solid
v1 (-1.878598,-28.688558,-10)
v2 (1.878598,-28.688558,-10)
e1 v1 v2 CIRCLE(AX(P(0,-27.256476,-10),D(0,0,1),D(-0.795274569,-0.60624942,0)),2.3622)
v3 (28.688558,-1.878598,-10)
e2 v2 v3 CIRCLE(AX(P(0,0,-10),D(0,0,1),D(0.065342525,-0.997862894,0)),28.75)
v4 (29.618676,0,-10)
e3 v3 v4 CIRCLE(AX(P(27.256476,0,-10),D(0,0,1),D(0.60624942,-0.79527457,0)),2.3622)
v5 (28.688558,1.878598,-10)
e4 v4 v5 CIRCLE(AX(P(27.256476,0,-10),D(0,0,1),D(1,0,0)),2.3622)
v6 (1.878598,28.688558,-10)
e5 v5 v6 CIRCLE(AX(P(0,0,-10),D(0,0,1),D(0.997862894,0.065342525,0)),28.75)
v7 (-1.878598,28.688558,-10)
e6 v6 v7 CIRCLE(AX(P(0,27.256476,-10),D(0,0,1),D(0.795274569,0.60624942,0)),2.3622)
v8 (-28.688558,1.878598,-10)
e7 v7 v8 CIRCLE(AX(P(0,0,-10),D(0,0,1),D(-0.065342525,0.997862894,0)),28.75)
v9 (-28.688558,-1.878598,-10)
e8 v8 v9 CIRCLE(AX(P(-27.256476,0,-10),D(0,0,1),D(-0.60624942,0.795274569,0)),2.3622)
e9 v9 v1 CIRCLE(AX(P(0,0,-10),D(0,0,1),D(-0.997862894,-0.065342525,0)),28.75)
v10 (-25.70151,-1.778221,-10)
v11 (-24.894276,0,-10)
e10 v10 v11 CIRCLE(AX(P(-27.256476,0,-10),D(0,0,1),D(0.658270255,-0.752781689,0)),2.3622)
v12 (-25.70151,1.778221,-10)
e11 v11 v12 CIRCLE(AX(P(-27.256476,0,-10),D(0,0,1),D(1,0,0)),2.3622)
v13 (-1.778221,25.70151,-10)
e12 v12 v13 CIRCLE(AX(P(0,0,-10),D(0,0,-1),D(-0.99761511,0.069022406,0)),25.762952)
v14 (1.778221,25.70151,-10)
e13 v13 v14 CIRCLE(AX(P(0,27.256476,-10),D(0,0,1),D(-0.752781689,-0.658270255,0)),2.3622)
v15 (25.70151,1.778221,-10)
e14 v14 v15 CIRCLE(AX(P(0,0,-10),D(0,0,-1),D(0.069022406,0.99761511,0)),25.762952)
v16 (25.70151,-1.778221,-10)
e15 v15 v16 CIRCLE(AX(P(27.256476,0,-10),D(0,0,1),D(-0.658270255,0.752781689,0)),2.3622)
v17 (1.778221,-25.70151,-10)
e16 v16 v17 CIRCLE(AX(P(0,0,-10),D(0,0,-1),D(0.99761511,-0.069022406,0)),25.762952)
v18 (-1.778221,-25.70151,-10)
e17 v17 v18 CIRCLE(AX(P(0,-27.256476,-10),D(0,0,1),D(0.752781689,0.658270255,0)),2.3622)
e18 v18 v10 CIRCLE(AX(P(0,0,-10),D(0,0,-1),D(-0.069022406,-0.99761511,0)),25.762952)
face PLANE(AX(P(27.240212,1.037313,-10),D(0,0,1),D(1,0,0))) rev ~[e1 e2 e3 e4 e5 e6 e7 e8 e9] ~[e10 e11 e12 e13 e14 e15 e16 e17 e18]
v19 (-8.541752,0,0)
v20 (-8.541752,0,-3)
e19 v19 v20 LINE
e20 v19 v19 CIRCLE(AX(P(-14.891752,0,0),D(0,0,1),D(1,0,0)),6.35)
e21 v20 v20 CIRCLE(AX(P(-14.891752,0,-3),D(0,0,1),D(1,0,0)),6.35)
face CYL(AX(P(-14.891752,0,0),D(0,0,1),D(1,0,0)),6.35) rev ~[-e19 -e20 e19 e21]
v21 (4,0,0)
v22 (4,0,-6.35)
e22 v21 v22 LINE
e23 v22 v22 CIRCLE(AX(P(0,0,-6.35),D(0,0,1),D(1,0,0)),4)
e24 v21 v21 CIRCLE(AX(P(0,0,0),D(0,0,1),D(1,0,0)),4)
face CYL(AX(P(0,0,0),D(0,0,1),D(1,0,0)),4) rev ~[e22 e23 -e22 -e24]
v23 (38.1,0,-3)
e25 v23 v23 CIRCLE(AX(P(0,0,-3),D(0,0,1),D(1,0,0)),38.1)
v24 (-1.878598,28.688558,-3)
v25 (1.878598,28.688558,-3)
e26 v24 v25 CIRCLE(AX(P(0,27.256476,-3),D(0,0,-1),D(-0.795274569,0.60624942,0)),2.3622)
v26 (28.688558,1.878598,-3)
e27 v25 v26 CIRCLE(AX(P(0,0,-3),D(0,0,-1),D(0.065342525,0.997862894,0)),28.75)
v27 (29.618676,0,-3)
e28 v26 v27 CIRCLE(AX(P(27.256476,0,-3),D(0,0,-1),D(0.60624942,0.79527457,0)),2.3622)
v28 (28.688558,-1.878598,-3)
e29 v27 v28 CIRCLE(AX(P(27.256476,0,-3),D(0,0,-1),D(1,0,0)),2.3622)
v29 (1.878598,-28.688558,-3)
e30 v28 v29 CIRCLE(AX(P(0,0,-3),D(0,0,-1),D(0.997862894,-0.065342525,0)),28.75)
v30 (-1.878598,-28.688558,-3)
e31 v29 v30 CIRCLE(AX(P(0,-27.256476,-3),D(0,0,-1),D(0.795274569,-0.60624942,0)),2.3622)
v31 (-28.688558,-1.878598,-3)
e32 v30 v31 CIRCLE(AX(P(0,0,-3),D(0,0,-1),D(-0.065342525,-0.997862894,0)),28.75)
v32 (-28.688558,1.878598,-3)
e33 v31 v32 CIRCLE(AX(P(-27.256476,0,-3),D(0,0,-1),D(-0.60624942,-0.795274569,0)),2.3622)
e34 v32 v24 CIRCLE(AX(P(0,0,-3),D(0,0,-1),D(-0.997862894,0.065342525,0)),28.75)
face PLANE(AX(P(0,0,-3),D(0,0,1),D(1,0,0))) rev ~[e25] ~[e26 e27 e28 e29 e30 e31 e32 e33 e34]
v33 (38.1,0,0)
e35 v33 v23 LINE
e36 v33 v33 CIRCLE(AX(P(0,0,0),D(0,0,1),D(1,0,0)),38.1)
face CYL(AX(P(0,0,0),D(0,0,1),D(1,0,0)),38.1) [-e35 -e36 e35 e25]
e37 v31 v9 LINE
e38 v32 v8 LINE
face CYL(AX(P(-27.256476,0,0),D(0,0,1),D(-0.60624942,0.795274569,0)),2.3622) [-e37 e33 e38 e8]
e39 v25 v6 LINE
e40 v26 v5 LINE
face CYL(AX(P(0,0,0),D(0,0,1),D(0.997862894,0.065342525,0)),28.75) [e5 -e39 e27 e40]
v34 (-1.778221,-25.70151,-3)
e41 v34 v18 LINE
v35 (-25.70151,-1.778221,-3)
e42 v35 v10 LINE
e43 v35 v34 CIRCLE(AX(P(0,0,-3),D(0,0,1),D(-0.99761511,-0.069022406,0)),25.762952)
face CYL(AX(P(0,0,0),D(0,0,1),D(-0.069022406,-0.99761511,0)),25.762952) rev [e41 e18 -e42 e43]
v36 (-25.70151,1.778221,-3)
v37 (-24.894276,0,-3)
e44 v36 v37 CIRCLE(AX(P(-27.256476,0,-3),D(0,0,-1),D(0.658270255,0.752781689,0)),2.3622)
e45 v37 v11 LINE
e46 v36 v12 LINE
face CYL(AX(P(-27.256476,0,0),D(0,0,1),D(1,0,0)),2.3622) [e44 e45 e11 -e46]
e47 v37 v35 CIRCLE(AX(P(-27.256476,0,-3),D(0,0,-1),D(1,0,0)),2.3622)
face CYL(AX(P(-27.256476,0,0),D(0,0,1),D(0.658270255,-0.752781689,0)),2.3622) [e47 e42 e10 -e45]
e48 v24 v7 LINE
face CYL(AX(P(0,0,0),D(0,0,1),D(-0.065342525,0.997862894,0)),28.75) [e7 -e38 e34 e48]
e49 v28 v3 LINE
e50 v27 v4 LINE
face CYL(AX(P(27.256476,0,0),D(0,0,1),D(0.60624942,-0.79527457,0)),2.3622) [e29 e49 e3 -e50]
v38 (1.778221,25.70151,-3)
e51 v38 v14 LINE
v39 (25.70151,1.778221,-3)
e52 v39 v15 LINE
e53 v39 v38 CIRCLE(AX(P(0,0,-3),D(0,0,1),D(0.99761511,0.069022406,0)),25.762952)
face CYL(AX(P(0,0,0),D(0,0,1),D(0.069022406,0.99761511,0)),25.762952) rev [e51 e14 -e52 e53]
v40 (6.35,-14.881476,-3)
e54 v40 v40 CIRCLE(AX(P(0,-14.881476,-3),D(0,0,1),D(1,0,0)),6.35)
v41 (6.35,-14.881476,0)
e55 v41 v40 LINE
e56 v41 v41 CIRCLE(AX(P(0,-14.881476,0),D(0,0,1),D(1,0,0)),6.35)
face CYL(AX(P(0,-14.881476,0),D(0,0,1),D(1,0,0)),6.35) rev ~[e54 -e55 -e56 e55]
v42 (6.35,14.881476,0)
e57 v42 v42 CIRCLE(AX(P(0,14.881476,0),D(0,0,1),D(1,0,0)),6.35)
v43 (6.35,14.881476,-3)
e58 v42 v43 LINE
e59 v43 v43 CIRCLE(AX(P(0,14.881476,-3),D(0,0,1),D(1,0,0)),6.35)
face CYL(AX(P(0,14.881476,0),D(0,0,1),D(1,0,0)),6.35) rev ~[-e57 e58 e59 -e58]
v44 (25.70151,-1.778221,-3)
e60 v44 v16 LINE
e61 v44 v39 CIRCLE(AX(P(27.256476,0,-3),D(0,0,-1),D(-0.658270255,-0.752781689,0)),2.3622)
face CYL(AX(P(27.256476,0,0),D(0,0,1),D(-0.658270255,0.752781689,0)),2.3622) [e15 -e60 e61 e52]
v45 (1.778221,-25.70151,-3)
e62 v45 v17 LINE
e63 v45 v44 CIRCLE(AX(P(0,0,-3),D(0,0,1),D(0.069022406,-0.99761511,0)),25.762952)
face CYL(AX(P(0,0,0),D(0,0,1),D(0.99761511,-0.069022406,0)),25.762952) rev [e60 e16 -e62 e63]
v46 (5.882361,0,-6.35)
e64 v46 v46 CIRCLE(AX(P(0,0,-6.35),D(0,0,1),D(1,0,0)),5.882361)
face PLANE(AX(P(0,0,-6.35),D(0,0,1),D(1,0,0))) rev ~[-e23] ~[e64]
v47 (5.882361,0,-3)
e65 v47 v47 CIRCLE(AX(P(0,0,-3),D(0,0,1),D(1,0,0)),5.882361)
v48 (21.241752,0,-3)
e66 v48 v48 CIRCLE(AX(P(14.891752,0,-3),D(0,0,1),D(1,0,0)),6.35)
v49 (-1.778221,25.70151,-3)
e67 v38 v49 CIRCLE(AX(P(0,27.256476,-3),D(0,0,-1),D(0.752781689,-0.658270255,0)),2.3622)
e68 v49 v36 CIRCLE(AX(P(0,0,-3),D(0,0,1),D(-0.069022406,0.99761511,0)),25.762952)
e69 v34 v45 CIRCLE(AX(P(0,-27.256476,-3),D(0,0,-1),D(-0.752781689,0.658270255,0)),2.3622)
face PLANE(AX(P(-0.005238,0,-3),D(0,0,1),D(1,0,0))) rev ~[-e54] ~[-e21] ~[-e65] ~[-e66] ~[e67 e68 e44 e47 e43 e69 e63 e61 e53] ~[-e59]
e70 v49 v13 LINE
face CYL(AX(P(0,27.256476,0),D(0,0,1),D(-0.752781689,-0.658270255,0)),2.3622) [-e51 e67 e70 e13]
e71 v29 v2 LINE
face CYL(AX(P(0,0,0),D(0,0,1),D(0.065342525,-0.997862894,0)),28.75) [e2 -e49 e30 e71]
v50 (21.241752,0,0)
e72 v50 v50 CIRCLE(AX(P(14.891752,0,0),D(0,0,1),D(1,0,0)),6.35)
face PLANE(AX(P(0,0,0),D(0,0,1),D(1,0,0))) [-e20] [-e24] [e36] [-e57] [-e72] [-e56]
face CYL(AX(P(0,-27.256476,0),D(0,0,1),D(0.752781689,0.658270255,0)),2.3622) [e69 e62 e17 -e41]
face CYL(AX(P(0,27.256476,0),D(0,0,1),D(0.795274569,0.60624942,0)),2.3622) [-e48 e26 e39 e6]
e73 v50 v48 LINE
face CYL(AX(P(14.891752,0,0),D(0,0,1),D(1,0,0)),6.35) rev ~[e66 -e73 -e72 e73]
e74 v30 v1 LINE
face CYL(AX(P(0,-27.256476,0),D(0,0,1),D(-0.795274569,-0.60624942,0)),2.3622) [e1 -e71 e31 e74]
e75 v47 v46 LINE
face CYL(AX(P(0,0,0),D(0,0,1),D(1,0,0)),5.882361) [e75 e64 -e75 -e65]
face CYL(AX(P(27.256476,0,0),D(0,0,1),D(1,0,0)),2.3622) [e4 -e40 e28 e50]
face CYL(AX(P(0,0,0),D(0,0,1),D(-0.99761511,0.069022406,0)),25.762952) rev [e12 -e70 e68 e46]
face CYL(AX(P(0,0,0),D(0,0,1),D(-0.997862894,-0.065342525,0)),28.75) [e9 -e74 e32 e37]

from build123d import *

# Parameters (mm, degrees)
F1_DEPTH = 10
F0_R     = 38.1
F0_R_2   = 6.35
F0_R_3   = 5.8823611715
F2_DEPTH = 3
F0_R_4   = 4
F3_DEPTH = 6.35


with BuildPart() as f1:
    # F0 (on Top) → F1 (new body)
    with BuildSketch(Plane.XY):
        with BuildLine():
            Line((25.7629516235, 0), (28.75, 0))
            ThreePointArc((28.75, 0), (28.7346354423, 0.9398010419), (28.6885581914, 1.878597588))
            ThreePointArc((28.6885581914, 1.878597588), (27.1771412956, 2.3608673988), (25.7015098149, 1.7782209055))
            ThreePointArc((25.7015098149, 1.7782209055), (25.7475865895, 0.889641035), (25.7629516235, 0))
        make_face()
        with BuildLine():
            ThreePointArc((28.6885581914, 1.878597588), (28.7346354423, 0.9398010419), (28.75, 0))
            ThreePointArc((28.75, 0), (28.7346354423, -0.9398010419), (28.6885581914, -1.878597588))
            ThreePointArc((28.6885581914, -1.878597588), (29.3734139116, -1.0481230469), (29.6186758117, 0))
            ThreePointArc((29.6186758117, 0), (29.3734139116, 1.0481230469), (28.6885581914, 1.878597588))
        make_face()
        with BuildLine():
            ThreePointArc((28.6885581914, -1.878597588), (28.7346354423, -0.9398010419), (28.75, 0))
            Line((28.75, 0), (25.7629516235, 0))
            ThreePointArc((25.7629516235, 0), (25.7475865895, -0.889641035), (25.7015098149, -1.7782209055))
            ThreePointArc((25.7015098149, -1.7782209055), (27.1771412956, -2.3608673988), (28.6885581914, -1.878597588))
        make_face()
        with BuildLine():
            ThreePointArc((25.7015098149, 1.7782209055), (27.1771412956, 2.3608673988), (28.6885581914, 1.878597588))
            ThreePointArc((28.6885581914, 1.878597588), (20.3293199591, 20.3293199591), (1.878597588, 28.6885581914))
            ThreePointArc((1.878597588, 28.6885581914), (2.2380361997, 28.0122421835), (2.3622, 27.2564758117))
            ThreePointArc((2.3622, 27.2564758117), (2.2113912208, 26.4259713213), (1.7782209055, 25.7015098149))
            ThreePointArc((1.7782209055, 25.7015098149), (18.2171577963, 18.2171577963), (25.7015098149, 1.7782209055))
        make_face()
        with BuildLine():
            ThreePointArc((1.878597588, -28.6885581914), (20.3293199591, -20.3293199591), (28.6885581914, -1.878597588))
            ThreePointArc((28.6885581914, -1.878597588), (27.1771412956, -2.3608673988), (25.7015098149, -1.7782209055))
            ThreePointArc((25.7015098149, -1.7782209055), (18.2171577963, -18.2171577963), (1.7782209055, -25.7015098149))
            ThreePointArc((1.7782209055, -25.7015098149), (2.2113912208, -26.4259713213), (2.3622, -27.2564758117))
            ThreePointArc((2.3622, -27.2564758117), (2.2380361997, -28.0122421835), (1.878597588, -28.6885581914))
        make_face()
        with BuildLine():
            ThreePointArc((25.7015098149, -1.7782209055), (25.7475865895, -0.889641035), (25.7629516235, 0))
            ThreePointArc((25.7629516235, 0), (25.7475865895, 0.889641035), (25.7015098149, 1.7782209055))
            ThreePointArc((25.7015098149, 1.7782209055), (24.8942758117, 0), (25.7015098149, -1.7782209055))
        make_face()
        with BuildLine():
            ThreePointArc((2.3622, 27.2564758117), (2.2380361997, 28.0122421835), (1.878597588, 28.6885581914))
            ThreePointArc((1.878597588, 28.6885581914), (0.9398010419, 28.7346354423), (0, 28.75))
            Line((0, 28.75), (0, 25.7629516235))
            ThreePointArc((0, 25.7629516235), (0.889641035, 25.7475865895), (1.7782209055, 25.7015098149))
            ThreePointArc((1.7782209055, 25.7015098149), (2.2113912208, 26.4259713213), (2.3622, 27.2564758117))
        make_face()
        with BuildLine():
            ThreePointArc((0, 28.75), (0.9398010419, 28.7346354423), (1.878597588, 28.6885581914))
            ThreePointArc((1.878597588, 28.6885581914), (0, 29.6186758117), (-1.878597588, 28.6885581914))
            ThreePointArc((-1.878597588, 28.6885581914), (-0.9398010419, 28.7346354423), (0, 28.75))
        make_face()
        with BuildLine():
            ThreePointArc((-1.878597588, -28.6885581914), (0, -29.6186758117), (1.878597588, -28.6885581914))
            ThreePointArc((1.878597588, -28.6885581914), (0.9398010419, -28.7346354423), (0, -28.75))
            ThreePointArc((0, -28.75), (-0.9398010419, -28.7346354423), (-1.878597588, -28.6885581914))
        make_face()
        with BuildLine():
            ThreePointArc((0, -28.75), (0.9398010419, -28.7346354423), (1.878597588, -28.6885581914))
            ThreePointArc((1.878597588, -28.6885581914), (2.2380361997, -28.0122421835), (2.3622, -27.2564758117))
            ThreePointArc((2.3622, -27.2564758117), (2.2113912208, -26.4259713213), (1.7782209055, -25.7015098149))
            ThreePointArc((1.7782209055, -25.7015098149), (0.889641035, -25.7475865895), (0, -25.7629516235))
            Line((0, -25.7629516235), (0, -28.75))
        make_face()
        with BuildLine():
            Line((0, 25.7629516235), (0, 28.75))
            ThreePointArc((0, 28.75), (-0.9398010419, 28.7346354423), (-1.878597588, 28.6885581914))
            ThreePointArc((-1.878597588, 28.6885581914), (-2.3608673988, 27.1771412956), (-1.7782209055, 25.7015098149))
            ThreePointArc((-1.7782209055, 25.7015098149), (-0.889641035, 25.7475865895), (0, 25.7629516235))
        make_face()
        with BuildLine():
            ThreePointArc((-1.7782209055, 25.7015098149), (-2.3608673988, 27.1771412956), (-1.878597588, 28.6885581914))
            ThreePointArc((-1.878597588, 28.6885581914), (-20.3293199591, 20.3293199591), (-28.6885581914, 1.878597588))
            ThreePointArc((-28.6885581914, 1.878597588), (-27.1771412956, 2.3608673988), (-25.7015098149, 1.7782209055))
            ThreePointArc((-25.7015098149, 1.7782209055), (-18.2171577963, 18.2171577963), (-1.7782209055, 25.7015098149))
        make_face()
        with BuildLine():
            ThreePointArc((-1.7782209055, 25.7015098149), (0, 24.8942758117), (1.7782209055, 25.7015098149))
            ThreePointArc((1.7782209055, 25.7015098149), (0.889641035, 25.7475865895), (0, 25.7629516235))
            ThreePointArc((0, 25.7629516235), (-0.889641035, 25.7475865895), (-1.7782209055, 25.7015098149))
        make_face()
        with BuildLine():
            ThreePointArc((-1.878597588, -28.6885581914), (-0.9398010419, -28.7346354423), (0, -28.75))
            Line((0, -28.75), (0, -25.7629516235))
            ThreePointArc((0, -25.7629516235), (-0.889641035, -25.7475865895), (-1.7782209055, -25.7015098149))
            ThreePointArc((-1.7782209055, -25.7015098149), (-2.3608673988, -27.1771412956), (-1.878597588, -28.6885581914))
        make_face()
        with BuildLine():
            ThreePointArc((-28.6885581914, -1.878597588), (-20.3293199591, -20.3293199591), (-1.878597588, -28.6885581914))
            ThreePointArc((-1.878597588, -28.6885581914), (-2.3608673988, -27.1771412956), (-1.7782209055, -25.7015098149))
            ThreePointArc((-1.7782209055, -25.7015098149), (-18.2171577963, -18.2171577963), (-25.7015098149, -1.7782209055))
            ThreePointArc((-25.7015098149, -1.7782209055), (-27.1771412956, -2.3608673988), (-28.6885581914, -1.878597588))
        make_face()
        with BuildLine():
            ThreePointArc((0, -25.7629516235), (0.889641035, -25.7475865895), (1.7782209055, -25.7015098149))
            ThreePointArc((1.7782209055, -25.7015098149), (0, -24.8942758117), (-1.7782209055, -25.7015098149))
            ThreePointArc((-1.7782209055, -25.7015098149), (-0.889641035, -25.7475865895), (0, -25.7629516235))
        make_face()
        with BuildLine():
            ThreePointArc((-25.7015098149, 1.7782209055), (-27.1771412956, 2.3608673988), (-28.6885581914, 1.878597588))
            ThreePointArc((-28.6885581914, 1.878597588), (-28.7346354423, 0.9398010419), (-28.75, 0))
            Line((-28.75, 0), (-25.7629516235, 0))
            ThreePointArc((-25.7629516235, 0), (-25.7475865895, 0.889641035), (-25.7015098149, 1.7782209055))
        make_face()
        with BuildLine():
            ThreePointArc((-28.75, 0), (-28.7346354423, 0.9398010419), (-28.6885581914, 1.878597588))
            ThreePointArc((-28.6885581914, 1.878597588), (-29.6186758117, 0), (-28.6885581914, -1.878597588))
            ThreePointArc((-28.6885581914, -1.878597588), (-28.7346354423, -0.9398010419), (-28.75, 0))
        make_face()
        with BuildLine():
            ThreePointArc((-28.75, 0), (-28.7346354423, -0.9398010419), (-28.6885581914, -1.878597588))
            ThreePointArc((-28.6885581914, -1.878597588), (-27.1771412956, -2.3608673988), (-25.7015098149, -1.7782209055))
            ThreePointArc((-25.7015098149, -1.7782209055), (-25.7475865895, -0.889641035), (-25.7629516235, 0))
            Line((-25.7629516235, 0), (-28.75, 0))
        make_face()
        with BuildLine():
            ThreePointArc((-24.8942758117, 0), (-25.1055307267, 0.9764343711), (-25.7015098149, 1.7782209055))
            ThreePointArc((-25.7015098149, 1.7782209055), (-25.7475865895, 0.889641035), (-25.7629516235, 0))
            ThreePointArc((-25.7629516235, 0), (-25.7475865895, -0.889641035), (-25.7015098149, -1.7782209055))
            ThreePointArc((-25.7015098149, -1.7782209055), (-25.1055307267, -0.9764343711), (-24.8942758117, 0))
        make_face()
    extrude(amount=-F1_DEPTH)

    # F0 (on Top) → F2 (join)
    with BuildSketch(Plane.XY):
        Circle(F0_R)
        with BuildLine():
            ThreePointArc((1.878597588, 28.6885581914), (20.3293199591, 20.3293199591), (28.6885581914, 1.878597588))
            ThreePointArc((28.6885581914, 1.878597588), (29.3734139116, 1.0481230469), (29.6186758117, 0))
            ThreePointArc((29.6186758117, 0), (29.3734139116, -1.0481230469), (28.6885581914, -1.878597588))
            ThreePointArc((28.6885581914, -1.878597588), (20.3293199591, -20.3293199591), (1.878597588, -28.6885581914))
            ThreePointArc((1.878597588, -28.6885581914), (0, -29.6186758117), (-1.878597588, -28.6885581914))
            ThreePointArc((-1.878597588, -28.6885581914), (-20.3293199591, -20.3293199591), (-28.6885581914, -1.878597588))
            ThreePointArc((-28.6885581914, -1.878597588), (-29.6186758117, 0), (-28.6885581914, 1.878597588))
            ThreePointArc((-28.6885581914, 1.878597588), (-20.3293199591, 20.3293199591), (-1.878597588, 28.6885581914))
            ThreePointArc((-1.878597588, 28.6885581914), (0, 29.6186758117), (1.878597588, 28.6885581914))
        make_face(mode=Mode.SUBTRACT)
        with BuildLine():
            ThreePointArc((25.7015098149, -1.7782209055), (24.8942758117, 0), (25.7015098149, 1.7782209055))
            ThreePointArc((25.7015098149, 1.7782209055), (18.2171577963, 18.2171577963), (1.7782209055, 25.7015098149))
            ThreePointArc((1.7782209055, 25.7015098149), (0, 24.8942758117), (-1.7782209055, 25.7015098149))
            ThreePointArc((-1.7782209055, 25.7015098149), (-18.2171577963, 18.2171577963), (-25.7015098149, 1.7782209055))
            ThreePointArc((-25.7015098149, 1.7782209055), (-25.1055307267, 0.9764343711), (-24.8942758117, 0))
            ThreePointArc((-24.8942758117, 0), (-25.1055307267, -0.9764343711), (-25.7015098149, -1.7782209055))
            ThreePointArc((-25.7015098149, -1.7782209055), (-18.2171577963, -18.2171577963), (-1.7782209055, -25.7015098149))
            ThreePointArc((-1.7782209055, -25.7015098149), (0, -24.8942758117), (1.7782209055, -25.7015098149))
            ThreePointArc((1.7782209055, -25.7015098149), (18.2171577963, -18.2171577963), (25.7015098149, -1.7782209055))
        make_face()
        with Locations((0, -14.8814758117)):
            Circle(F0_R_2, mode=Mode.SUBTRACT)
        with Locations((-14.8917516235, 0)):
            Circle(F0_R_2, mode=Mode.SUBTRACT)
        Circle(F0_R_3, mode=Mode.SUBTRACT)
        with Locations((14.8917516235, 0)):
            Circle(F0_R_2, mode=Mode.SUBTRACT)
        with Locations((0, 14.8814758117)):
            Circle(F0_R_2, mode=Mode.SUBTRACT)
    extrude(amount=-F2_DEPTH)

    # F0 (on Top) → F3 (join)
    with BuildSketch(Plane.XY):
        Circle(F0_R_3)
        Circle(F0_R_4, mode=Mode.SUBTRACT)
    extrude(amount=-F3_DEPTH)


solid = f1.part
